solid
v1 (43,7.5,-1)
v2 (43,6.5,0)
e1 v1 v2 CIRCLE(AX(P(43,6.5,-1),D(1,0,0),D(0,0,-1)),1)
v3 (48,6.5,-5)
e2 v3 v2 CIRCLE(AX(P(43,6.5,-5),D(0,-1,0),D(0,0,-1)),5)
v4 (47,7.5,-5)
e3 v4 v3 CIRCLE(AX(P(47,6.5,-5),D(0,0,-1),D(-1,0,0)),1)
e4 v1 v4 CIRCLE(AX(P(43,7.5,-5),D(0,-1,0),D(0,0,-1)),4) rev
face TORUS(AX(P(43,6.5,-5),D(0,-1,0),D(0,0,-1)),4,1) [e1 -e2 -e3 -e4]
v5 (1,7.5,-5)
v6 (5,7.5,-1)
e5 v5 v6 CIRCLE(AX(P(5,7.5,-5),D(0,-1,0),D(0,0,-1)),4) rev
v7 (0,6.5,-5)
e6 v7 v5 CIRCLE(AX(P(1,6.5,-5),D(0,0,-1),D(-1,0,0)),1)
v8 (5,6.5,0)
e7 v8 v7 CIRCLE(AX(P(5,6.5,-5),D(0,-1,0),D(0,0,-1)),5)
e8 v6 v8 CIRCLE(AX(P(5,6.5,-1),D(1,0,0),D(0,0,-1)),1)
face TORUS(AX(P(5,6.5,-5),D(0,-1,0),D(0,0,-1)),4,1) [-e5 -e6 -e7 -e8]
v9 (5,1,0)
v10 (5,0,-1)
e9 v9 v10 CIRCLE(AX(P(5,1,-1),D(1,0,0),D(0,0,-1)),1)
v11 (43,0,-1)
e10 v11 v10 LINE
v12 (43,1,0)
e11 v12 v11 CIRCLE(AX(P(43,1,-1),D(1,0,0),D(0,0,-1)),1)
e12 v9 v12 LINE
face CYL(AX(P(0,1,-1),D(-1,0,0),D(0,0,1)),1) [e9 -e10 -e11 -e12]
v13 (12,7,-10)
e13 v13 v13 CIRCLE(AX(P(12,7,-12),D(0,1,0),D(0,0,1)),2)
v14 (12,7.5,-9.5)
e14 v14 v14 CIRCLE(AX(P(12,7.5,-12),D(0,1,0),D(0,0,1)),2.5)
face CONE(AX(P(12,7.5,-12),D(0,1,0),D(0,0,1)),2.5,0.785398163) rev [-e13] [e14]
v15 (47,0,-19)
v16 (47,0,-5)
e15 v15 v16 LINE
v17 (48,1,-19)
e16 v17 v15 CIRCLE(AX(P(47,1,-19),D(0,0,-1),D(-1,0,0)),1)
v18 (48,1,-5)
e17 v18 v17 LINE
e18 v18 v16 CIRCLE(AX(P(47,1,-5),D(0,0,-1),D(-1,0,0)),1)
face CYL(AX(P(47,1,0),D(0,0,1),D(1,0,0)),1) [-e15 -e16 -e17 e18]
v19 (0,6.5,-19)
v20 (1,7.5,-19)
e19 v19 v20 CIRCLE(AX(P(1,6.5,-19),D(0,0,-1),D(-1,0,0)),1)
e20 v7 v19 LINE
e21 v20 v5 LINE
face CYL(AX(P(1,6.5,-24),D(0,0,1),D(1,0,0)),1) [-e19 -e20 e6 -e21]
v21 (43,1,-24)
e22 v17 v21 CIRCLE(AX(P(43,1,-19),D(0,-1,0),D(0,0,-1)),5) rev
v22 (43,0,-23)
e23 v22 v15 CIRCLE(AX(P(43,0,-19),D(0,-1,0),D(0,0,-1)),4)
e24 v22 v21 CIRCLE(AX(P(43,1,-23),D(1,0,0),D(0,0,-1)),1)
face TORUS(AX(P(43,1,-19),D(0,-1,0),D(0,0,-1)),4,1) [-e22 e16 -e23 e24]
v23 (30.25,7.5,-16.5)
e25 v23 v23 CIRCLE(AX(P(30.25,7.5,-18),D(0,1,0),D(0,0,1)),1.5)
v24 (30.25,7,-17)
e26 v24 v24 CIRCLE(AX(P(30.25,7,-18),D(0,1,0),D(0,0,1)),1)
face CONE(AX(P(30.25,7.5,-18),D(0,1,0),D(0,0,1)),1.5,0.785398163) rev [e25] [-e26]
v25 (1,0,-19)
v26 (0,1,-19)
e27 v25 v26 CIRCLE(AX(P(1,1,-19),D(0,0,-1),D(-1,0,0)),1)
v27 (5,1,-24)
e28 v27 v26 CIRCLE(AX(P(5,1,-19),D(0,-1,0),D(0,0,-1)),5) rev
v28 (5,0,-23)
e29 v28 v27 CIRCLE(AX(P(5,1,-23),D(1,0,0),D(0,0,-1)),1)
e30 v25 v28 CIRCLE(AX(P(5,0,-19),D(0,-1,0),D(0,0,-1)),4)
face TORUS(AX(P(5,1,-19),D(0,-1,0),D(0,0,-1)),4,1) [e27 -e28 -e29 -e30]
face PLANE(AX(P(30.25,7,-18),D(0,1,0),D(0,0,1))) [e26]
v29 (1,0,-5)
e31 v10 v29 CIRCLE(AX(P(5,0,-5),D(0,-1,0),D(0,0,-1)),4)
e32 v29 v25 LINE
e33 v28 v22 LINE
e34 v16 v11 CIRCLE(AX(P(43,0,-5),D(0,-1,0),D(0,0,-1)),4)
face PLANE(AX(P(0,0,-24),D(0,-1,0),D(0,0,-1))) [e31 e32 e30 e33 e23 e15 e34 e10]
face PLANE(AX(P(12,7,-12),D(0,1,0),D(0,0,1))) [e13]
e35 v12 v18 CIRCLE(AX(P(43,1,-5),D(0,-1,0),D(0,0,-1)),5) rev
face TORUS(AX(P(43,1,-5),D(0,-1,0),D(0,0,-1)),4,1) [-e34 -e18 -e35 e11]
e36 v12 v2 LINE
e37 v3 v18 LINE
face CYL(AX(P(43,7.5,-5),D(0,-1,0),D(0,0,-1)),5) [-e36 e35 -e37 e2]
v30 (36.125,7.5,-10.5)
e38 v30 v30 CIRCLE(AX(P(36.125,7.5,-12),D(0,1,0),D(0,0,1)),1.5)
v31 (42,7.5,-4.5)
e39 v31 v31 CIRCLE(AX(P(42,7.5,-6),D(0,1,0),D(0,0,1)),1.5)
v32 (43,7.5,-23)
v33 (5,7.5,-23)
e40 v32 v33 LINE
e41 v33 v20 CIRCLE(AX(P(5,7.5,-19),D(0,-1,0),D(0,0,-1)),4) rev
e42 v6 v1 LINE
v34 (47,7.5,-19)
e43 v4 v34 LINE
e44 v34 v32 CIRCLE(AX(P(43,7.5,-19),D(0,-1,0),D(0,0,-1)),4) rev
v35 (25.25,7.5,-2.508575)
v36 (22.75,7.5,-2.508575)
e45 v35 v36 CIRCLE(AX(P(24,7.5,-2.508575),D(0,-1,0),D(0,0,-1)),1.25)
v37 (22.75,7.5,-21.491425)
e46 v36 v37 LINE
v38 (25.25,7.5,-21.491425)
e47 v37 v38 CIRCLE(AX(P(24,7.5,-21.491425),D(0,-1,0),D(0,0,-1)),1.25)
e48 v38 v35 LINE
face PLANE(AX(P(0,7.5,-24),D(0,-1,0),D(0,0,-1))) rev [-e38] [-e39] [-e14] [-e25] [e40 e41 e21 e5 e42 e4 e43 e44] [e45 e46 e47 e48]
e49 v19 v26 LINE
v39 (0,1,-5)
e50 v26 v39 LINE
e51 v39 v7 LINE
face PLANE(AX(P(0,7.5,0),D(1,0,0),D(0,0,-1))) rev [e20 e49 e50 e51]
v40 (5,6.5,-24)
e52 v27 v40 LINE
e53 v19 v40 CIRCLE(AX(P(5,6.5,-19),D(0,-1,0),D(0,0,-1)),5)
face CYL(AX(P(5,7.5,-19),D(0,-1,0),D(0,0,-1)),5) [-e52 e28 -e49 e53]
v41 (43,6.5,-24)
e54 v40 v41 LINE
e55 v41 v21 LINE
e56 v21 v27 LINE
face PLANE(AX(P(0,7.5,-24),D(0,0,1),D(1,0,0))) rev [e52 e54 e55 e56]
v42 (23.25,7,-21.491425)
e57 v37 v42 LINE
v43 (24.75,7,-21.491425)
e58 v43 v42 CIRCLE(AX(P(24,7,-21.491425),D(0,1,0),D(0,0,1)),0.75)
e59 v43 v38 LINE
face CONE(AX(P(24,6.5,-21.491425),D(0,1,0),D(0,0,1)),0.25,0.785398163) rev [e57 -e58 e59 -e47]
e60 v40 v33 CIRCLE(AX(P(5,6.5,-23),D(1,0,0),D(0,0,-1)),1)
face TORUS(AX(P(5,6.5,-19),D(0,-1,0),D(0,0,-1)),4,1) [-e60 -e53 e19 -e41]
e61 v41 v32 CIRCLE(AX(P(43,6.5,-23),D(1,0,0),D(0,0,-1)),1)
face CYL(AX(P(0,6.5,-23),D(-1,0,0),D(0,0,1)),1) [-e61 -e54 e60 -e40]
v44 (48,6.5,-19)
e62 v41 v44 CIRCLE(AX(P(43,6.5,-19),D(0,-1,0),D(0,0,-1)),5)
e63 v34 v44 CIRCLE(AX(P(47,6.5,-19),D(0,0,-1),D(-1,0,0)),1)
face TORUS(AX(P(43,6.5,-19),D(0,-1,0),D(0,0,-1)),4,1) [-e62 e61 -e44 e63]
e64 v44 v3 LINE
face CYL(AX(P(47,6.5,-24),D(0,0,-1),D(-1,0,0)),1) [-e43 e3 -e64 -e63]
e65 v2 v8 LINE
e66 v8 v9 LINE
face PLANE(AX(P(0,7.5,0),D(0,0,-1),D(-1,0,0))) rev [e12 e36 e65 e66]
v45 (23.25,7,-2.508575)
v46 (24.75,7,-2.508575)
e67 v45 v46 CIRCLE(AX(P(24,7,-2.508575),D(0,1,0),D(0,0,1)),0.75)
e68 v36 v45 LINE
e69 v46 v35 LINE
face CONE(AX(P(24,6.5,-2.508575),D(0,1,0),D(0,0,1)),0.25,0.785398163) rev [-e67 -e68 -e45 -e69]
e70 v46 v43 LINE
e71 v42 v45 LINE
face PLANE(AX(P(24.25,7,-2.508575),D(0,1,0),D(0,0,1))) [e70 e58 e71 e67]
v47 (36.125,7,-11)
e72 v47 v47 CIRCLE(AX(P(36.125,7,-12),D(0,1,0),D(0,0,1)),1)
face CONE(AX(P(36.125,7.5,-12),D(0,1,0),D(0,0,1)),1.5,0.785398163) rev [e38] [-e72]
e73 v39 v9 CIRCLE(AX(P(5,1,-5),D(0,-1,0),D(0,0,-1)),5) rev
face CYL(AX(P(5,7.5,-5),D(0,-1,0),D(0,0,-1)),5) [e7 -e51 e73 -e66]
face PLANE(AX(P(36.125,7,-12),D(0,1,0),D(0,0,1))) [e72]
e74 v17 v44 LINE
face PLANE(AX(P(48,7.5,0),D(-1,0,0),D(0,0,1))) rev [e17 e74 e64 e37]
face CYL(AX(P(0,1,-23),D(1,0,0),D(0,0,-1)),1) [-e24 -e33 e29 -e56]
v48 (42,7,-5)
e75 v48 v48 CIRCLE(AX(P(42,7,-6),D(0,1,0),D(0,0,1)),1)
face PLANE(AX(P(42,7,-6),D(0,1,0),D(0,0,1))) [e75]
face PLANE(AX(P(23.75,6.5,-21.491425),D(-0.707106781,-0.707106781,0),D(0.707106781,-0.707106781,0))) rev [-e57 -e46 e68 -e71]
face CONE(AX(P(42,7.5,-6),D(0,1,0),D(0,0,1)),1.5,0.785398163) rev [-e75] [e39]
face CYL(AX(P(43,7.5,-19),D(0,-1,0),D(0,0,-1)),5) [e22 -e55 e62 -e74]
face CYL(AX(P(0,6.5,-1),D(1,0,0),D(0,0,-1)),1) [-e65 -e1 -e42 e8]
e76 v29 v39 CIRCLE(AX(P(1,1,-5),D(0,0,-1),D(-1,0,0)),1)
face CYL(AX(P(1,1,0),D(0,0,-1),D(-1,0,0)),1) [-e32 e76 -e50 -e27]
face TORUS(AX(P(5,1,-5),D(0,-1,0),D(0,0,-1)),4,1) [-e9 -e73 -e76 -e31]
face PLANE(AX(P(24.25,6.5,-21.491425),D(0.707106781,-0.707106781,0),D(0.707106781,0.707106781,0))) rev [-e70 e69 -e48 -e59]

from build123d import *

# Parameters (mm, degrees)
ESQUISSE1_W                = 48
ESQUISSE1_H                = 24
EXTRUSION1_DEPTH           = 7.5
CONG_2_R                   = 5
CONG_5_R                   = 1
CONG_6_R                   = 1
ESQUISSE4_W                = 0.5
ESQUISSE4_H                = 18.982849842
EXTRUSION2_DEPTH           = 0.5
ESQUISSE5_R                = 0.25
EXTRUSION3_DEPTH           = 0.5
CHANFREIN1_SIZE            = 1
ESQUISSE9_R                = 1.5
EXTRUSION6_DEPTH           = 0.5
EXTRUSION6_DRAFT           = -45
EXTRUSION6_PROFILE_2_DEPTH = 0.5
EXTRUSION6_PROFILE_2_DRAFT = -45
EXTRUSION6_PROFILE_3_DEPTH = 0.5
EXTRUSION6_PROFILE_3_DRAFT = -45
ESQUISSE10_R               = 2.5
EXTRUSION8_DEPTH           = 0.5
EXTRUSION8_DRAFT           = -45


with BuildPart() as part:
    # Esquisse1 → Extrusion1 (new body)
    with BuildSketch(Plane(origin=(0, 0, 0), x_dir=(1, 0, 0), z_dir=(0, 1, 0))):
        with Locations((24, 12)):
            Rectangle(ESQUISSE1_W, ESQUISSE1_H)
    extrude(amount=EXTRUSION1_DEPTH)

    # Congé2
    cong_2_edges = [part.edges().sort_by_distance(p)[0] for p in [
        (0, 3.75, -24),
        (48, 3.75, -24),
        (48, 3.75, 0),
        (0, 3.75, 0),
    ]]
    fillet(cong_2_edges, radius=CONG_2_R)

    # Congé5
    cong_5_edges = [part.edges().sort_by_distance(p)[0] for p in [
        (48, 7.5, -12),
        (24, 7.5, 0),
        (0, 7.5, -12),
        (24, 7.5, -24),
        (1.464466094, 7.5, -22.535533906),
        (1.464466094, 7.5, -1.464466094),
        (46.535533906, 7.5, -22.535533906),
        (46.535533906, 7.5, -1.464466094),
    ]]
    fillet(cong_5_edges, radius=CONG_5_R)

    # Congé6
    cong_6_edges = [part.edges().sort_by_distance(p)[0] for p in [
        (48, 0, -12),
        (0, 0, -12),
        (24, 0, -24),
        (24, 0, 0),
        (1.464466094, 0, -22.535533906),
        (1.464466094, 0, -1.464466094),
        (46.535533906, 0, -22.535533906),
        (46.535533906, 0, -1.464466094),
    ]]
    fillet(cong_6_edges, radius=CONG_6_R)

    # Esquisse4 → Extrusion2 (cut)
    with BuildSketch(Plane(origin=(0, 7.5, 0), x_dir=(1, 0, 0), z_dir=(0, 1, 0))):
        with Locations((24, 12)):
            Rectangle(ESQUISSE4_W, ESQUISSE4_H)
    extrude(amount=-EXTRUSION2_DEPTH, mode=Mode.SUBTRACT)

    # Esquisse5 → Extrusion3 (cut)
    with BuildSketch(Plane(origin=(0, 7.5, 0), x_dir=(1, 0, 0), z_dir=(0, 1, 0))):
        with Locations((24, 21.491424921)):
            Circle(ESQUISSE5_R)
        with Locations((24, 2.508575079)):
            Circle(ESQUISSE5_R)
    extrude(amount=-EXTRUSION3_DEPTH, mode=Mode.SUBTRACT)

    # Chanfrein1
    # the kernel refuses this chamfer: 1 mm, written as the material it takes off along each edge
    with BuildSketch(Plane(origin=(24, 7.5, -21.491424921), x_dir=(1, 0, 0), z_dir=(0, 0, 1))) as chanfrein1_piece_1_section:
        Polygon((0.25 + CHANFREIN1_SIZE, 0), (0.25, -CHANFREIN1_SIZE), (0.25, 0), align=None)
    chanfrein1_piece_1 = revolve(axis=Axis((24, 7.5, -21.491424921), (0, 1, 0)), revolution_arc=180, mode=Mode.PRIVATE)
    chanfrein1_piece_1 = split(chanfrein1_piece_1, bisect_by=Plane(origin=(24, 7, -21.964580549), z_dir=(0, 1, 0)), keep=Keep.TOP, mode=Mode.PRIVATE)
    add(chanfrein1_piece_1, mode=Mode.SUBTRACT)
    with BuildSketch(Plane(origin=(24.25, 7.5, -21.491424921), x_dir=(0.9996219169112968, 0.02749587661058651, 0), z_dir=(0, 0, 1))) as chanfrein1_piece_2_section:
        Polygon((CHANFREIN1_SIZE * 0.999621916911, -CHANFREIN1_SIZE * 0.0274958766106), (-CHANFREIN1_SIZE * 0.0274958766106, -CHANFREIN1_SIZE * 0.999621916911), (0, 0), align=None)
    chanfrein1_piece_2 = extrude(amount=18.982849842, mode=Mode.PRIVATE)
    chanfrein1_piece_2 = split(chanfrein1_piece_2, bisect_by=Plane(origin=(24.643401084, 7, -12), z_dir=(0, 1, 0)), keep=Keep.TOP, mode=Mode.PRIVATE)
    add(chanfrein1_piece_2, mode=Mode.SUBTRACT)
    with BuildSketch(Plane(origin=(24, 7.5, -2.508575079), x_dir=(-1, 0, 0), z_dir=(0, 0, -1))) as chanfrein1_piece_3_section:
        Polygon((0.25 + CHANFREIN1_SIZE, 0), (0.25, -CHANFREIN1_SIZE), (0.25, 0), align=None)
    chanfrein1_piece_3 = revolve(axis=Axis((24, 7.5, -2.508575079), (0, 1, 0)), revolution_arc=180, mode=Mode.PRIVATE)
    chanfrein1_piece_3 = split(chanfrein1_piece_3, bisect_by=Plane(origin=(24, 7, -2.035419451), z_dir=(0, 1, 0)), keep=Keep.TOP, mode=Mode.PRIVATE)
    add(chanfrein1_piece_3, mode=Mode.SUBTRACT)
    with BuildSketch(Plane(origin=(23.75, 7.5, -2.508575079), x_dir=(-0.9996219169112968, 0.02749587661058651, 0), z_dir=(0, 0, -1))) as chanfrein1_piece_4_section:
        Polygon((CHANFREIN1_SIZE * 0.999621916911, -CHANFREIN1_SIZE * 0.0274958766106), (-CHANFREIN1_SIZE * 0.0274958766106, -CHANFREIN1_SIZE * 0.999621916911), (0, 0), align=None)
    chanfrein1_piece_4 = extrude(amount=18.982849842, mode=Mode.PRIVATE)
    chanfrein1_piece_4 = split(chanfrein1_piece_4, bisect_by=Plane(origin=(23.356598916, 7, -12), z_dir=(0, 1, 0)), keep=Keep.TOP, mode=Mode.PRIVATE)
    add(chanfrein1_piece_4, mode=Mode.SUBTRACT)


with BuildPart() as extrusion6_tool:
    # Esquisse9 → Extrusion6 (with draft: the straight prism first)
    with BuildSketch(Plane(origin=(0, 7.5, 0), x_dir=(1, 0, 0), z_dir=(0, 1, 0))):
        with Locations((30.25, 18)):
            Circle(ESQUISSE9_R)
    extrude(amount=-EXTRUSION6_DEPTH)
    # Extrusion6: the draft: its side faces are tilted about the plane it starts from
    extrusion6_sides = [extrusion6_tool.faces().sort_by_distance(p)[0] for p in [
        (28.75, 7.25, -18),
    ]]
    draft(extrusion6_sides, Plane(origin=(0, 7.5, 0), x_dir=(1, 0, 0), z_dir=(0, 1, 0)), EXTRUSION6_DRAFT)


with BuildPart() as part_1:
    add(part.part)

    # Extrusion6: cut by extrusion6_tool
    add(extrusion6_tool.part, mode=Mode.SUBTRACT)


with BuildPart() as extrusion6_profile_2_tool:
    # Esquisse9 → Extrusion6 profile 2 (with draft: the straight prism first)
    with BuildSketch(Plane(origin=(0, 7.5, 0), x_dir=(1, 0, 0), z_dir=(0, 1, 0))):
        with Locations((36.125, 12)):
            Circle(ESQUISSE9_R)
    extrude(amount=-EXTRUSION6_PROFILE_2_DEPTH)
    # Extrusion6 profile 2: the draft: its side faces are tilted about the plane it starts from
    extrusion6_profile_2_sides = [extrusion6_profile_2_tool.faces().sort_by_distance(p)[0] for p in [
        (34.625, 7.25, -12),
    ]]
    draft(extrusion6_profile_2_sides, Plane(origin=(0, 7.5, 0), x_dir=(1, 0, 0), z_dir=(0, 1, 0)), EXTRUSION6_PROFILE_2_DRAFT)


with BuildPart() as part_2:
    add(part_1.part)

    # Extrusion6 profile 2: cut by extrusion6_profile_2_tool
    add(extrusion6_profile_2_tool.part, mode=Mode.SUBTRACT)


with BuildPart() as extrusion6_profile_3_tool:
    # Esquisse9 → Extrusion6 profile 3 (with draft: the straight prism first)
    with BuildSketch(Plane(origin=(0, 7.5, 0), x_dir=(1, 0, 0), z_dir=(0, 1, 0))):
        with Locations((42, 6)):
            Circle(ESQUISSE9_R)
    extrude(amount=-EXTRUSION6_PROFILE_3_DEPTH)
    # Extrusion6 profile 3: the draft: its side faces are tilted about the plane it starts from
    extrusion6_profile_3_sides = [extrusion6_profile_3_tool.faces().sort_by_distance(p)[0] for p in [
        (40.5, 7.25, -6),
    ]]
    draft(extrusion6_profile_3_sides, Plane(origin=(0, 7.5, 0), x_dir=(1, 0, 0), z_dir=(0, 1, 0)), EXTRUSION6_PROFILE_3_DRAFT)


with BuildPart() as part_3:
    add(part_2.part)

    # Extrusion6 profile 3: cut by extrusion6_profile_3_tool
    add(extrusion6_profile_3_tool.part, mode=Mode.SUBTRACT)


with BuildPart() as extrusion8_tool:
    # Esquisse10 → Extrusion8 (with draft: the straight prism first)
    with BuildSketch(Plane(origin=(0, 7.5, 0), x_dir=(1, 0, 0), z_dir=(0, 1, 0))):
        with Locations((12, 12)):
            Circle(ESQUISSE10_R)
    extrude(amount=-EXTRUSION8_DEPTH)
    # Extrusion8: the draft: its side faces are tilted about the plane it starts from
    extrusion8_sides = [extrusion8_tool.faces().sort_by_distance(p)[0] for p in [
        (9.5, 7.25, -12),
    ]]
    draft(extrusion8_sides, Plane(origin=(0, 7.5, 0), x_dir=(1, 0, 0), z_dir=(0, 1, 0)), EXTRUSION8_DRAFT)


with BuildPart() as part_4:
    add(part_3.part)

    # Extrusion8: cut by extrusion8_tool
    add(extrusion8_tool.part, mode=Mode.SUBTRACT)


solid = part_4.part
